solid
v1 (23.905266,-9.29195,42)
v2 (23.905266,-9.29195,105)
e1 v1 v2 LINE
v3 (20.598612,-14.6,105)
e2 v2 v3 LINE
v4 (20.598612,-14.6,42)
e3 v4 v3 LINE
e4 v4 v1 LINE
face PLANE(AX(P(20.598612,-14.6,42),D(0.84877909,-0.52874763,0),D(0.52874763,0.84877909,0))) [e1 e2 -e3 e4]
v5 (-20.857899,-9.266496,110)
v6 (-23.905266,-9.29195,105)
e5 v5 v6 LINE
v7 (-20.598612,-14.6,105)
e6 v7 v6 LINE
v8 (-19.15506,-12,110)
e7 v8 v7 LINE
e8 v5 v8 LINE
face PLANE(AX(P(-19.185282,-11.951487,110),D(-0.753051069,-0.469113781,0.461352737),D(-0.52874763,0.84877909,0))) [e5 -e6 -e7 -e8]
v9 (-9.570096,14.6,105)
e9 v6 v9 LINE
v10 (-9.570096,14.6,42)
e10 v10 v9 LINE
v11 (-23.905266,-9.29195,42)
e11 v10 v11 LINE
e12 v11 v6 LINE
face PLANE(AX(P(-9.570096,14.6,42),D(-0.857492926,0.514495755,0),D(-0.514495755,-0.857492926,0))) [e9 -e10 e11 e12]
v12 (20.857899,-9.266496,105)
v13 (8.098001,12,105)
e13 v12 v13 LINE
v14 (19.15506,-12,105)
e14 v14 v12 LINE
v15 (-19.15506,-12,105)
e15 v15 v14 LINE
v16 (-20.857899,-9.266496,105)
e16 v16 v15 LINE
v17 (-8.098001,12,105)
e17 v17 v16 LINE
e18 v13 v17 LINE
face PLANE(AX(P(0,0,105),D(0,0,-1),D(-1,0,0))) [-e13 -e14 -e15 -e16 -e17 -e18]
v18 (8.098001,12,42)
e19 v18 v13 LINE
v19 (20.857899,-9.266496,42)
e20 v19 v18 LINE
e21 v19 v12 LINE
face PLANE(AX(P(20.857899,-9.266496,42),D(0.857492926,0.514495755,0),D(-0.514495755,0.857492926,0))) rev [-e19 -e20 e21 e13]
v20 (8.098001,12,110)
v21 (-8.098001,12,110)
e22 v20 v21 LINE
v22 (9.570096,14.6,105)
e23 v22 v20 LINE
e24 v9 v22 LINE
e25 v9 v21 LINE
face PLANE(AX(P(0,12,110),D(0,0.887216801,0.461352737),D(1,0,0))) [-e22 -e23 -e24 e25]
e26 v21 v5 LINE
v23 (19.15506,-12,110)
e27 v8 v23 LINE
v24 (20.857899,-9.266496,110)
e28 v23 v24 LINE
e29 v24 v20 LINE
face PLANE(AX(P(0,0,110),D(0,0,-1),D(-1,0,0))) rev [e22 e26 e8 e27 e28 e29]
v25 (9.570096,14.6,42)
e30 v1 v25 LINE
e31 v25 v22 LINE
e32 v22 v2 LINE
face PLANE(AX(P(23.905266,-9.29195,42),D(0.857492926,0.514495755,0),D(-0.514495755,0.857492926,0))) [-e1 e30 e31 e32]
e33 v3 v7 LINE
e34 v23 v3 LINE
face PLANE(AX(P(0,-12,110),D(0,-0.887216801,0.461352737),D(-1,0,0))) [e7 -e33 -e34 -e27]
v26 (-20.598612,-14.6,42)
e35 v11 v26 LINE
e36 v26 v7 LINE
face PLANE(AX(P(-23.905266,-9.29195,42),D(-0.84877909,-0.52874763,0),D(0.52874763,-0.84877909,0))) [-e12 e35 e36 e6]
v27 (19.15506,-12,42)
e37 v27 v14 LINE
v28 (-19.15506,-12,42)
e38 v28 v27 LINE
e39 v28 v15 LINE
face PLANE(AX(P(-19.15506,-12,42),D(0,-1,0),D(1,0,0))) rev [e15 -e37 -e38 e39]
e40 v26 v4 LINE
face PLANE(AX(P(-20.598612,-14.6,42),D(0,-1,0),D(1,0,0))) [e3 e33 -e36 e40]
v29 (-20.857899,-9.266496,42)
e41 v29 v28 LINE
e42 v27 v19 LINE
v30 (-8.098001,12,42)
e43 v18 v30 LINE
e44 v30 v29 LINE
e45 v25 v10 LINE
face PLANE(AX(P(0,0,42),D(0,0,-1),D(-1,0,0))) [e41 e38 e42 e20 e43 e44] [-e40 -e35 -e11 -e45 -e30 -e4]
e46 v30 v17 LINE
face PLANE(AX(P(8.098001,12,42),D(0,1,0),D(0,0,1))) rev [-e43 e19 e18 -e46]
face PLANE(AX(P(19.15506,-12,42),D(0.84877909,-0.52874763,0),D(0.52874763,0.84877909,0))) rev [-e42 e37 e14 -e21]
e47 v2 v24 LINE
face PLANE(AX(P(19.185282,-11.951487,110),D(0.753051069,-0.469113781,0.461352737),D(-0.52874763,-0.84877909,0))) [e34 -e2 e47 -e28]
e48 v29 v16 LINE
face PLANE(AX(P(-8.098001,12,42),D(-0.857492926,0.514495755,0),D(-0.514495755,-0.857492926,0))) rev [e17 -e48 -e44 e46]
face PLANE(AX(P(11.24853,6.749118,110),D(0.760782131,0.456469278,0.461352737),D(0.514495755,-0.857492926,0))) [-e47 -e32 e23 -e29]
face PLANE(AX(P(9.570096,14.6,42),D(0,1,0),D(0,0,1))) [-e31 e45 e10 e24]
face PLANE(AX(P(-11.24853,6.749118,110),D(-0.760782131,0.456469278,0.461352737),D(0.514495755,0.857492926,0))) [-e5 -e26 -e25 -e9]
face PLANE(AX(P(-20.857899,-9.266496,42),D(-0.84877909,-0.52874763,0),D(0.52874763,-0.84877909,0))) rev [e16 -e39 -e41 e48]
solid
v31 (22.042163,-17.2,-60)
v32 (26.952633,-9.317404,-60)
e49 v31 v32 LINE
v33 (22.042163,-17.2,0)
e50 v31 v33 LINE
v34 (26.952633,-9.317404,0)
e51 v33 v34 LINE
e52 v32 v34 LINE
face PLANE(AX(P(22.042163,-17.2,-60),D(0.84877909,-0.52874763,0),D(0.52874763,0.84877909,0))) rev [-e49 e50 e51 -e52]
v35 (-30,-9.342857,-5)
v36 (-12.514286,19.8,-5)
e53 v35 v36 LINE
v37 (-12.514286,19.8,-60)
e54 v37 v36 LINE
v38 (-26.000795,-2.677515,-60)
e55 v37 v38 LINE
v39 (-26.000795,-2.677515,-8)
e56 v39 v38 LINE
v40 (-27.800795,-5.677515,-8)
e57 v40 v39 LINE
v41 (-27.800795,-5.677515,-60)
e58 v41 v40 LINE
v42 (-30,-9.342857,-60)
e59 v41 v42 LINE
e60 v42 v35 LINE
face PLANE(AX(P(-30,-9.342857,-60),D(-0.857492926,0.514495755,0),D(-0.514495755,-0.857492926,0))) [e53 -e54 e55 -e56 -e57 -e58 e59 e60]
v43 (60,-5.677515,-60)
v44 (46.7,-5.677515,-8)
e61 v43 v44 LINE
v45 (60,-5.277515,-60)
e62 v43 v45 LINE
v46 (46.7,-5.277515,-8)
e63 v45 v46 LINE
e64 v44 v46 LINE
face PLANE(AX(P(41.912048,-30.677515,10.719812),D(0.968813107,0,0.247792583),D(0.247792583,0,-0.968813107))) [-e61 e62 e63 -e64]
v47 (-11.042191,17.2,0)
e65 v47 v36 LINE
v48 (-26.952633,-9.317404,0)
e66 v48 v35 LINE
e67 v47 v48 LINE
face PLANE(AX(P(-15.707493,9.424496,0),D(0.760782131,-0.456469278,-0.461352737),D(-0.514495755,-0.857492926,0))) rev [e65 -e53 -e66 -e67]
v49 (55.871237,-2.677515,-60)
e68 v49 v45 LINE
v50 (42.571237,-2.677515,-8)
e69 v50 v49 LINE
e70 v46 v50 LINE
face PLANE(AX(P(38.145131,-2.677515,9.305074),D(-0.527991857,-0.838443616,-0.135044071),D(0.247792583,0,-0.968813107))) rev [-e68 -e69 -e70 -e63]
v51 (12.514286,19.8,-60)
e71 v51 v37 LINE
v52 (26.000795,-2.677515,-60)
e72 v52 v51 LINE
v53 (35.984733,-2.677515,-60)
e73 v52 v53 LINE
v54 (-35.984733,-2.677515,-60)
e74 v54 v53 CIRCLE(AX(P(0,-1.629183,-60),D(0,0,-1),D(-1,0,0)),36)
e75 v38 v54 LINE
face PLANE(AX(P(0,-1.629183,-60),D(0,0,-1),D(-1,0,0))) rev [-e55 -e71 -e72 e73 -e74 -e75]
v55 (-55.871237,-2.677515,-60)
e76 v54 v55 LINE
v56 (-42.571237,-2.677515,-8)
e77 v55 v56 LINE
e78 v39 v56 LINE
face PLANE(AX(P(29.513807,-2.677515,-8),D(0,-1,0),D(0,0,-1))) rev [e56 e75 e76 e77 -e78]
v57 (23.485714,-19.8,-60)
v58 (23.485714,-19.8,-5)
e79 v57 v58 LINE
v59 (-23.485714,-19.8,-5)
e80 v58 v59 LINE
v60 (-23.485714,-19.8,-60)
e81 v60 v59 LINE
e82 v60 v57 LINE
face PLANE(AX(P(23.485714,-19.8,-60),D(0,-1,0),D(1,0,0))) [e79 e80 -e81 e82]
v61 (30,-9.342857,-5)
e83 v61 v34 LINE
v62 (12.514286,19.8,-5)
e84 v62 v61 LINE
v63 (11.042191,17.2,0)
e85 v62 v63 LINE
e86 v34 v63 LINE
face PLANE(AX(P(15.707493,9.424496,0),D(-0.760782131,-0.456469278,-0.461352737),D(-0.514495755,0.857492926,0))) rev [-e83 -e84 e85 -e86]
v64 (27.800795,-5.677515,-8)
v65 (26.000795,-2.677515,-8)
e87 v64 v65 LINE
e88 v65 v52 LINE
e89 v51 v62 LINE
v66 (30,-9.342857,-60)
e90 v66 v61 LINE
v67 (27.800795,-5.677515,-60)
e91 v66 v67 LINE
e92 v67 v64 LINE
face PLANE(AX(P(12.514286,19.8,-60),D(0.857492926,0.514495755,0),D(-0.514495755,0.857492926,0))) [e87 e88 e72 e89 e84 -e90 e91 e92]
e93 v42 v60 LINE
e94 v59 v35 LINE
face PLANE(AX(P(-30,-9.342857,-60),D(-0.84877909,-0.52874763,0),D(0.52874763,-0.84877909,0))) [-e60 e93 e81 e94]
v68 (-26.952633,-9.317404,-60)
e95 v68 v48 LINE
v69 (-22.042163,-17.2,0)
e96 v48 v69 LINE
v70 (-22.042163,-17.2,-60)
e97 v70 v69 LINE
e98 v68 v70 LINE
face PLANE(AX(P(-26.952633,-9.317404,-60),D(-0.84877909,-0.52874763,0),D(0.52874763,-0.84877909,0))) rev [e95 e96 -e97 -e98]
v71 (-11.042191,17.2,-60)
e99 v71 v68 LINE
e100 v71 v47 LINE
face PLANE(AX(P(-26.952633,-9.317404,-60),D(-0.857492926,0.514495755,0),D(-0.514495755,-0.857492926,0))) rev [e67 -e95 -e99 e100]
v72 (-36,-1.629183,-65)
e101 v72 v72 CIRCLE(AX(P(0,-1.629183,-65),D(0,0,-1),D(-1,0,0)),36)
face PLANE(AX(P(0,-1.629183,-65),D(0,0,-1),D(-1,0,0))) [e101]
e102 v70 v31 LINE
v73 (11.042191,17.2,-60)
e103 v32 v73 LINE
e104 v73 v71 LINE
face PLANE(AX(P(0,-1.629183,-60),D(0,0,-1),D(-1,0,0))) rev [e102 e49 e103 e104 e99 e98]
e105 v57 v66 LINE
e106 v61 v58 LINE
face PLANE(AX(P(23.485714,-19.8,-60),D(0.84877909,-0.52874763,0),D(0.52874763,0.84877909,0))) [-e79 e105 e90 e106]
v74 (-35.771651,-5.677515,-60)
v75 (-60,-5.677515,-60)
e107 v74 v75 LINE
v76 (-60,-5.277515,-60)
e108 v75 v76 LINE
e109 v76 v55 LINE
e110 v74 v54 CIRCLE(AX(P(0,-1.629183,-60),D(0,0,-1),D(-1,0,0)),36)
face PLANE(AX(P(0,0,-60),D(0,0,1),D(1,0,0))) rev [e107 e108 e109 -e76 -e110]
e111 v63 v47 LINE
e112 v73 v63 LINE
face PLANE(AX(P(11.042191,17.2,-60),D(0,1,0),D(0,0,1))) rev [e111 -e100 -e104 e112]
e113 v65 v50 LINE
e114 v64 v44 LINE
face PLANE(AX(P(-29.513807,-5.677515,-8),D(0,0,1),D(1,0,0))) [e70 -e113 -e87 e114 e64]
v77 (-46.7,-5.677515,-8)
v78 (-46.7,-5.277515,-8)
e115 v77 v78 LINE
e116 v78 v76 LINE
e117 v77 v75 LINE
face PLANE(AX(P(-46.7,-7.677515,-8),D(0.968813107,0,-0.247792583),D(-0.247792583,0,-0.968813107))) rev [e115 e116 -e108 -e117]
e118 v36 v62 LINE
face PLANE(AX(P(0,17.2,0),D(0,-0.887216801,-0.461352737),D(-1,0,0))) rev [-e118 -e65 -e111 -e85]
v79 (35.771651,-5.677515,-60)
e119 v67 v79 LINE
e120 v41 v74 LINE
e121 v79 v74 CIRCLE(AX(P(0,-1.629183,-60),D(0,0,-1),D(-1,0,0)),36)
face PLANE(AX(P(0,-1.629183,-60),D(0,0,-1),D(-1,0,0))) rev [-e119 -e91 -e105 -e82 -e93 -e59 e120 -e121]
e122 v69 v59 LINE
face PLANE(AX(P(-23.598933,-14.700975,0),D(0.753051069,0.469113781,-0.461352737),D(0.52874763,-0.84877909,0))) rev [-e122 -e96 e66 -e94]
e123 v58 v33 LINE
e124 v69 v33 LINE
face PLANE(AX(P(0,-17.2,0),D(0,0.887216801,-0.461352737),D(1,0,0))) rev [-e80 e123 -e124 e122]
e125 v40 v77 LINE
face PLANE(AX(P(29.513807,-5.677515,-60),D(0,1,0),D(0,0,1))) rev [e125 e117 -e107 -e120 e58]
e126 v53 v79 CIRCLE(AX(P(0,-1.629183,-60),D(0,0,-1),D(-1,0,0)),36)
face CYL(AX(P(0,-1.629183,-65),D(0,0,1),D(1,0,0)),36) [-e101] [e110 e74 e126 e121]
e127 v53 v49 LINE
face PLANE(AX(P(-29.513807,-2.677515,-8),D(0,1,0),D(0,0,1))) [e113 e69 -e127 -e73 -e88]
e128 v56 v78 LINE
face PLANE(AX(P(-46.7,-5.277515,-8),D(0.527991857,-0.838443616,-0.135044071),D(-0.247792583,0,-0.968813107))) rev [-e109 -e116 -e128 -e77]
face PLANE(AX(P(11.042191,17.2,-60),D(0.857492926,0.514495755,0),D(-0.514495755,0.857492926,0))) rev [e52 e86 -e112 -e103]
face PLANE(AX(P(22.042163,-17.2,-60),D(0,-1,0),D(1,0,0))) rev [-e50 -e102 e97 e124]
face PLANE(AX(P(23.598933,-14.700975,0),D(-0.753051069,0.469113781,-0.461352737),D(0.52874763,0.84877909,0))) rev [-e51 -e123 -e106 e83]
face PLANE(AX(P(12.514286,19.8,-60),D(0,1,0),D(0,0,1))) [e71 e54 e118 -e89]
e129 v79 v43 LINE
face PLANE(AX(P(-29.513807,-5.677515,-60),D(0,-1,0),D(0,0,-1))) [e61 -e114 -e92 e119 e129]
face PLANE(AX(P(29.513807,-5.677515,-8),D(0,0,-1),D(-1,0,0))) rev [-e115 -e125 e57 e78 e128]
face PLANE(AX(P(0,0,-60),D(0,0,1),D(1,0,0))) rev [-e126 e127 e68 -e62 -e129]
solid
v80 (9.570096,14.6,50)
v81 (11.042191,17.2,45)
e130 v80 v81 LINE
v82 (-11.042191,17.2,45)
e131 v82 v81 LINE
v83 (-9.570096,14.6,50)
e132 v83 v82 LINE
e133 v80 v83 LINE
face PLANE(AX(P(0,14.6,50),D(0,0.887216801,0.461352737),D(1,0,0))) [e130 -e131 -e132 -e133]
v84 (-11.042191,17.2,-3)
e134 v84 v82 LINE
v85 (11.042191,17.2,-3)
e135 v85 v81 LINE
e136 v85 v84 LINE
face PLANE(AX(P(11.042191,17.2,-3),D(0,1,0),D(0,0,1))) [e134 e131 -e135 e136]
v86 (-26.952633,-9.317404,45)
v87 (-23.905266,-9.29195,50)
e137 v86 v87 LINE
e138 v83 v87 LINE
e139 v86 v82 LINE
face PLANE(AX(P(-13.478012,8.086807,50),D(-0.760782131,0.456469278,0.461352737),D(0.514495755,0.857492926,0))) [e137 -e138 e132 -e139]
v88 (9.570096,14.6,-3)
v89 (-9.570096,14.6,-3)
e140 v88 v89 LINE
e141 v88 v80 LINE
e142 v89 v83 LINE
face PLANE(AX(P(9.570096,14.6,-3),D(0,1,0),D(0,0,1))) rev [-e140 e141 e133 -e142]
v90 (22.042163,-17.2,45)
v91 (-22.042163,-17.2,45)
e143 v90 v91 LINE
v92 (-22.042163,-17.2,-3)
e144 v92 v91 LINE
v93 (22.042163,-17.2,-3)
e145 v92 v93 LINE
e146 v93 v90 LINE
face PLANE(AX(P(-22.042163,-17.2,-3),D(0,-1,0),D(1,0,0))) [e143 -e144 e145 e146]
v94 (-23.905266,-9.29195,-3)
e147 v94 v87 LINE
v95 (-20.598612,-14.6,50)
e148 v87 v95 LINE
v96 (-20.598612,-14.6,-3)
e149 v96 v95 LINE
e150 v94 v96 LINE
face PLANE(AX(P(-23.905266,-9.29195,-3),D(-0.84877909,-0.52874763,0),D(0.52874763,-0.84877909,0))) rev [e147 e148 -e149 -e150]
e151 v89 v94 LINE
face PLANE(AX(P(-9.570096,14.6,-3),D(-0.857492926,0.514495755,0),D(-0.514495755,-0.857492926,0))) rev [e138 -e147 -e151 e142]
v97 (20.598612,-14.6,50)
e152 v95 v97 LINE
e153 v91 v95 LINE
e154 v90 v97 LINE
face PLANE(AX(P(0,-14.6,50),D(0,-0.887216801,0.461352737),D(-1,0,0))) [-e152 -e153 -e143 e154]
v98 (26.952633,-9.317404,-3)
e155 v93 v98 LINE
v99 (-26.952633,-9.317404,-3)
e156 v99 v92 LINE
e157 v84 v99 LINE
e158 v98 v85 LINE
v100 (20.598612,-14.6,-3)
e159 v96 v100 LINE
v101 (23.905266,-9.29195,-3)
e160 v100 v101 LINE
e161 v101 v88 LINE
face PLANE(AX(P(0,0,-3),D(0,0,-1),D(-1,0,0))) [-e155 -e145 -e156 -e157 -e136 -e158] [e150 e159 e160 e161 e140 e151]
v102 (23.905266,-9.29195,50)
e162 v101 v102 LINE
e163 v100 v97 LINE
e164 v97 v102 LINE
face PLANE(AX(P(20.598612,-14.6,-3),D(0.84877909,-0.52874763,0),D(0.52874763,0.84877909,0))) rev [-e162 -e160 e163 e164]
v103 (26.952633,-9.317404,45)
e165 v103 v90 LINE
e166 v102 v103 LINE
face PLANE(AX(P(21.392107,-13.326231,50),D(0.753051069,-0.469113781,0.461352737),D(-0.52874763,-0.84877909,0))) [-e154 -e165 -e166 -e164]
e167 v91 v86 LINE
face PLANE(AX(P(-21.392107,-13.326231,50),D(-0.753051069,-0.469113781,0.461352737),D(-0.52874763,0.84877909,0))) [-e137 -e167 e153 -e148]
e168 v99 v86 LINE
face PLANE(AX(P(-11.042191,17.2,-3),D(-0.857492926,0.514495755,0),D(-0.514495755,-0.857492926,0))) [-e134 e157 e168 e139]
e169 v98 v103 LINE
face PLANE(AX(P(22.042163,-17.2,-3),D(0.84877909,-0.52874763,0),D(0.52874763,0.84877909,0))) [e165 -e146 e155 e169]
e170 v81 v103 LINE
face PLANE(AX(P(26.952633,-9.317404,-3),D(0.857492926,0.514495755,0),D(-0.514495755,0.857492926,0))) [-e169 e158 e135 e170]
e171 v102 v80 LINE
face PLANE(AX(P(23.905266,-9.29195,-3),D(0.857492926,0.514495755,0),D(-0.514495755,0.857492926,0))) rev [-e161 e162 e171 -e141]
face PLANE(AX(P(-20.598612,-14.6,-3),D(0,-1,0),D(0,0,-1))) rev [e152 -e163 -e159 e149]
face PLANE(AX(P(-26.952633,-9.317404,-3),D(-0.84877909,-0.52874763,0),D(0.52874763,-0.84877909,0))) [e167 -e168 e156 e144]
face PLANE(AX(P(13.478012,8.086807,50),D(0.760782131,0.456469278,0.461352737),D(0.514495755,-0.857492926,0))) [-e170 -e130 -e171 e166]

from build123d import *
from OCP.BRepFilletAPI import BRepFilletAPI_MakeChamfer

# Parameters (mm, degrees)
BOSS_EXTRUDE1_DEPTH      = 60
BOSS_EXTRUDE2_DEPTH      = 50
BOSS_EXTRUDE2_DEPTH_BACK = 3
CHAMFER1_SIZE            = 5
CHAMFER1_SIZE_2          = 2.6
BOSS_EXTRUDE3_DEPTH      = 60
BOSS_EXTRUDE3_DEPTH_BACK = 8
CHAMFER2_SIZE            = 2.6
CHAMFER2_SIZE_2          = 5
BOSS_EXTRUDE4_REACH      = 145.499
SKETCH9_W                = 52
SKETCH9_H                = 3
CUT_EXTRUDE1_DEPTH       = 28
CHAMFER3_SIZE            = 2.6
CHAMFER3_SIZE_2          = 5
BOSS_EXTRUDE5_DEPTH      = 5
BOSS_EXTRUDE6_REACH      = 165.988
SKETCH13_W               = 52
SKETCH13_H               = 3
CUT_EXTRUDE2_DEPTH       = 5
CHAMFER4_SIZE            = 4
CHAMFER4_SIZE2           = 2.6
CHAMFER5_SIZE            = 2.6
CHAMFER5_SIZE2           = 4
SKETCH16_R               = 36
BOSS_EXTRUDE7_DEPTH      = 5


with BuildPart() as part:
    # Sketch1 → Boss-Extrude1 (new body)
    with BuildSketch(Plane.XY):
        Polygon((23.485714286, -19.8), (-23.485714286, -19.8), (-30, -9.342857143), (-12.514285714, 19.8), (12.514285714, 19.8), (30, -9.342857143), align=None)
        Polygon((-26.95263288, -9.317403585), (-11.042190729, 17.2), (11.042190729, 17.2), (26.95263288, -9.317403585), (22.042162982, -17.2), (-22.042162982, -17.2), align=None, mode=Mode.SUBTRACT)
    extrude(amount=-BOSS_EXTRUDE1_DEPTH)

    # Chamfer1
    chamfer1_edges_1 = [part.edges().sort_by_distance(p)[0] for p in [
        (26.742857143, -14.571428571, 0),
    ]]
    chamfer1_side_1 = [part.faces().sort_by_distance(p)[0] for p in [
        (26.742857143, -14.571428571, -0.052),
    ]]
    chamfer1_edges_2 = [part.edges().sort_by_distance(p)[0] for p in [
        (0, -19.8, 0),
    ]]
    chamfer1_side_2 = [part.faces().sort_by_distance(p)[0] for p in [
        (0, -19.8, -0.052),
    ]]
    chamfer1_edges_3 = [part.edges().sort_by_distance(p)[0] for p in [
        (-26.742857143, -14.571428571, 0),
    ]]
    chamfer1_side_3 = [part.faces().sort_by_distance(p)[0] for p in [
        (-26.742857143, -14.571428571, -0.052),
    ]]
    chamfer1_edges_4 = [part.edges().sort_by_distance(p)[0] for p in [
        (-21.257142857, 5.228571429, 0),
    ]]
    chamfer1_side_4 = [part.faces().sort_by_distance(p)[0] for p in [
        (-21.257142857, 5.228571429, -0.052),
    ]]
    chamfer1_edges_5 = [part.edges().sort_by_distance(p)[0] for p in [
        (0, 19.8, 0),
    ]]
    chamfer1_side_5 = [part.faces().sort_by_distance(p)[0] for p in [
        (0, 19.8, -0.052),
    ]]
    chamfer1_edges_6 = [part.edges().sort_by_distance(p)[0] for p in [
        (21.257142857, 5.228571429, 0),
    ]]
    chamfer1_side_6 = [part.faces().sort_by_distance(p)[0] for p in [
        (21.257142857, 5.228571429, -0.052),
    ]]
    chamfer1 = BRepFilletAPI_MakeChamfer(part.part.solid().wrapped)
    for e in chamfer1_edges_1:
        chamfer1.Add(CHAMFER1_SIZE - 0.0001, CHAMFER1_SIZE_2 - 0.0001, e.wrapped, chamfer1_side_1[0].wrapped)
    for e in chamfer1_edges_2:
        chamfer1.Add(CHAMFER1_SIZE - 0.0001, CHAMFER1_SIZE_2 - 0.0001, e.wrapped, chamfer1_side_2[0].wrapped)
    for e in chamfer1_edges_3:
        chamfer1.Add(CHAMFER1_SIZE - 0.0001, CHAMFER1_SIZE_2 - 0.0001, e.wrapped, chamfer1_side_3[0].wrapped)
    for e in chamfer1_edges_4:
        chamfer1.Add(CHAMFER1_SIZE - 0.0001, CHAMFER1_SIZE_2 - 0.0001, e.wrapped, chamfer1_side_4[0].wrapped)
    for e in chamfer1_edges_5:
        chamfer1.Add(CHAMFER1_SIZE - 0.0001, CHAMFER1_SIZE_2 - 0.0001, e.wrapped, chamfer1_side_5[0].wrapped)
    for e in chamfer1_edges_6:
        chamfer1.Add(CHAMFER1_SIZE - 0.0001, CHAMFER1_SIZE_2 - 0.0001, e.wrapped, chamfer1_side_6[0].wrapped)
    add(Compound.cast(chamfer1.Shape()), mode=Mode.REPLACE)  # a hair under: the kernel refuses the full size

    # Boss-Extrude4: up to this plane
    boss_extrude4_end = Plane(origin=(12.514285714, 19.8, -60), z_dir=(0.8574929257125442, 0.5144957554275265, 0))
    # Sketch9 → Boss-Extrude4 (add, up to the surface)
    with BuildSketch(Plane(origin=(60, 0, 0), x_dir=(0, 0, -1), z_dir=(1, 0, 0)), mode=Mode.PRIVATE) as boss_extrude4_sk1:
        with Locations((34, -4.177515253)):
            Rectangle(SKETCH9_W, SKETCH9_H)
    boss_extrude4_tool1 = split(extrude(boss_extrude4_sk1.sketch, amount=-BOSS_EXTRUDE4_REACH, mode=Mode.PRIVATE), bisect_by=boss_extrude4_end, keep=Keep.BOTH, mode=Mode.PRIVATE)
    add(boss_extrude4_tool1.solids().sort_by_distance((60, -4.177515, -34))[0])

    # Sketch10 → Cut-Extrude1 (cut)
    with BuildSketch(Plane(origin=(0, -2.677515253, 0), x_dir=(1, 0, 0), z_dir=(0, 1, 0))):
        Polygon((60, 8), (60, 60), (46.7, 8), align=None)
    extrude(amount=-CUT_EXTRUDE1_DEPTH, mode=Mode.SUBTRACT)

    # Boss-Extrude6: up to this plane
    boss_extrude6_end = Plane(origin=(-30, -9.342857143, -60), z_dir=(-0.8574929257125442, 0.5144957554275265, 0))
    # Sketch13 → Boss-Extrude6 (add, up to the surface)
    with BuildSketch(Plane(origin=(-60, 0, 0), x_dir=(0, 0, -1), z_dir=(1, 0, 0)), mode=Mode.PRIVATE) as boss_extrude6_sk1:
        with Locations((34, -4.177515253)):
            Rectangle(SKETCH13_W, SKETCH13_H)
    boss_extrude6_tool1 = split(extrude(boss_extrude6_sk1.sketch, amount=BOSS_EXTRUDE6_REACH, mode=Mode.PRIVATE), bisect_by=boss_extrude6_end, keep=Keep.BOTH, mode=Mode.PRIVATE)
    add(boss_extrude6_tool1.solids().sort_by_distance((-60, -4.177515, -34))[0])

    # Sketch14 → Cut-Extrude2 (cut)
    with BuildSketch(Plane(origin=(0, -2.677515253, 0), x_dir=(1, 0, 0), z_dir=(0, 1, 0))):
        Polygon((-60, 60), (-60, 8), (-46.7, 8), align=None)
    extrude(amount=-CUT_EXTRUDE2_DEPTH, mode=Mode.SUBTRACT)

    # Chamfer4
    chamfer4_edges = [part.edges().sort_by_distance(p)[0] for p in [
        (-53.35, -2.677515253, -34),
    ]]
    chamfer4_side = [part.faces().sort_by_distance(p)[0] for p in [
        (-39.944890335, -2.677515253, -36.10731292),
    ]]
    chamfer(chamfer4_edges, length=CHAMFER4_SIZE, length2=CHAMFER4_SIZE2, reference=chamfer4_side[0])

    # Chamfer5
    chamfer5_edges = [part.edges().sort_by_distance(p)[0] for p in [
        (53.35, -2.677515253, -34),
    ]]
    chamfer5_side = [part.faces().sort_by_distance(p)[0] for p in [
        (53.35, -4.177515253, -34),
    ]]
    chamfer(chamfer5_edges, length=CHAMFER5_SIZE, length2=CHAMFER5_SIZE2, reference=chamfer5_side[0])

    # Sketch16 → Boss-Extrude7 (add)
    with BuildSketch(Plane(origin=(0, 0, -60), x_dir=(-1, 0, 0), z_dir=(0, 0, -1))):
        with Locations(Location((0, -1.629183352, 0), (0, 0, 181.66870794))):
            Circle(SKETCH16_R)
    extrude(amount=BOSS_EXTRUDE7_DEPTH)


with BuildPart() as body_2:
    # Sketch2 → Boss-Extrude2 (new, two sides: drawn at the far end of the back side and taken through both)
    with BuildSketch(Plane.XY.offset(-BOSS_EXTRUDE2_DEPTH_BACK)):
        Polygon((26.95263288, -9.317403585), (11.042190729, 17.2), (-11.042190729, 17.2), (-26.95263288, -9.317403585), (-22.042162982, -17.2), (22.042162982, -17.2), align=None)
        Polygon((23.90526576, -9.291950027), (9.570095744, 14.6), (-9.570095744, 14.6), (-23.90526576, -9.291950027), (-20.598611678, -14.6), (20.598611678, -14.6), align=None, mode=Mode.SUBTRACT)
    extrude(amount=BOSS_EXTRUDE2_DEPTH + BOSS_EXTRUDE2_DEPTH_BACK)

    # Chamfer2
    chamfer2_edges_1 = [body_2.edges().sort_by_distance(p)[0] for p in [
        (24.497397931, -13.258701792, 50),
    ]]
    chamfer2_side_1 = [body_2.faces().sort_by_distance(p)[0] for p in [
        (24.453261418, -13.231206916, 50),
    ]]
    chamfer2_edges_2 = [body_2.edges().sort_by_distance(p)[0] for p in [
        (18.997411804, 3.941298208, 50),
    ]]
    chamfer2_side_2 = [body_2.faces().sort_by_distance(p)[0] for p in [
        (18.997411804, 3.941298208, 49.948),
    ]]
    chamfer2_edges_3 = [body_2.edges().sort_by_distance(p)[0] for p in [
        (0, 17.2, 50),
    ]]
    chamfer2_side_3 = [body_2.faces().sort_by_distance(p)[0] for p in [
        (0, 17.2, 49.948),
    ]]
    chamfer2_edges_4 = [body_2.edges().sort_by_distance(p)[0] for p in [
        (-18.997411804, 3.941298208, 50),
    ]]
    chamfer2_side_4 = [body_2.faces().sort_by_distance(p)[0] for p in [
        (-18.997411804, 3.941298208, 49.948),
    ]]
    chamfer2_edges_5 = [body_2.edges().sort_by_distance(p)[0] for p in [
        (-24.497397931, -13.258701792, 50),
    ]]
    chamfer2_side_5 = [body_2.faces().sort_by_distance(p)[0] for p in [
        (-24.497397931, -13.258701792, 49.948),
    ]]
    chamfer2_edges_6 = [body_2.edges().sort_by_distance(p)[0] for p in [
        (0, -17.2, 50),
    ]]
    chamfer2_side_6 = [body_2.faces().sort_by_distance(p)[0] for p in [
        (0, -17.2, 49.948),
    ]]
    chamfer2 = BRepFilletAPI_MakeChamfer(body_2.part.solid().wrapped)
    for e in chamfer2_edges_1:
        chamfer2.Add(CHAMFER2_SIZE - 0.0001, CHAMFER2_SIZE_2 - 0.0001, e.wrapped, chamfer2_side_1[0].wrapped)
    for e in chamfer2_edges_2:
        chamfer2.Add(CHAMFER2_SIZE_2 - 0.0001, CHAMFER2_SIZE - 0.0001, e.wrapped, chamfer2_side_2[0].wrapped)
    for e in chamfer2_edges_3:
        chamfer2.Add(CHAMFER2_SIZE_2 - 0.0001, CHAMFER2_SIZE - 0.0001, e.wrapped, chamfer2_side_3[0].wrapped)
    for e in chamfer2_edges_4:
        chamfer2.Add(CHAMFER2_SIZE_2 - 0.0001, CHAMFER2_SIZE - 0.0001, e.wrapped, chamfer2_side_4[0].wrapped)
    for e in chamfer2_edges_5:
        chamfer2.Add(CHAMFER2_SIZE_2 - 0.0001, CHAMFER2_SIZE - 0.0001, e.wrapped, chamfer2_side_5[0].wrapped)
    for e in chamfer2_edges_6:
        chamfer2.Add(CHAMFER2_SIZE_2 - 0.0001, CHAMFER2_SIZE - 0.0001, e.wrapped, chamfer2_side_6[0].wrapped)
    add(Compound.cast(chamfer2.Shape()), mode=Mode.REPLACE)  # a hair under: the kernel refuses the full size


with BuildPart() as body_3:
    # Sketch8 → Boss-Extrude3 (new, two sides: drawn at the far end of the back side and taken through both)
    with BuildSketch(Plane.XY.offset(50).offset(-BOSS_EXTRUDE3_DEPTH_BACK)):
        Polygon((23.90526576, -9.291950027), (9.570095744, 14.6), (-9.570095744, 14.6), (-23.90526576, -9.291950027), (-20.598611678, -14.6), (20.598611678, -14.6), align=None)
        Polygon((19.155060374, -12), (20.85789864, -9.266496469), (8.098000758, 12), (-8.098000758, 12), (-20.85789864, -9.266496469), (-19.155060374, -12), align=None, mode=Mode.SUBTRACT)
    extrude(amount=BOSS_EXTRUDE3_DEPTH + BOSS_EXTRUDE3_DEPTH_BACK)

    # Chamfer3
    chamfer3_edges_1 = [body_3.edges().sort_by_distance(p)[0] for p in [
        (22.251938719, -11.945975013, 110),
    ]]
    chamfer3_side_1 = [body_3.faces().sort_by_distance(p)[0] for p in [
        (22.207802206, -11.918480137, 110),
    ]]
    chamfer3_edges_2 = [body_3.edges().sort_by_distance(p)[0] for p in [
        (16.737680752, 2.654024987, 110),
    ]]
    chamfer3_side_2 = [body_3.faces().sort_by_distance(p)[0] for p in [
        (16.737680752, 2.654024987, 109.948),
    ]]
    chamfer3_edges_3 = [body_3.edges().sort_by_distance(p)[0] for p in [
        (0, 14.6, 110),
    ]]
    chamfer3_side_3 = [body_3.faces().sort_by_distance(p)[0] for p in [
        (0, 14.6, 109.948),
    ]]
    chamfer3_edges_4 = [body_3.edges().sort_by_distance(p)[0] for p in [
        (-16.737680752, 2.654024987, 110),
    ]]
    chamfer3_side_4 = [body_3.faces().sort_by_distance(p)[0] for p in [
        (-16.737680752, 2.654024987, 109.948),
    ]]
    chamfer3_edges_5 = [body_3.edges().sort_by_distance(p)[0] for p in [
        (-22.251938719, -11.945975013, 110),
    ]]
    chamfer3_side_5 = [body_3.faces().sort_by_distance(p)[0] for p in [
        (-22.251938719, -11.945975013, 109.948),
    ]]
    chamfer3_edges_6 = [body_3.edges().sort_by_distance(p)[0] for p in [
        (0, -14.6, 110),
    ]]
    chamfer3_side_6 = [body_3.faces().sort_by_distance(p)[0] for p in [
        (0, -14.6, 109.948),
    ]]
    chamfer3 = BRepFilletAPI_MakeChamfer(body_3.part.solid().wrapped)
    for e in chamfer3_edges_1:
        chamfer3.Add(CHAMFER3_SIZE - 0.0001, CHAMFER3_SIZE_2 - 0.0001, e.wrapped, chamfer3_side_1[0].wrapped)
    for e in chamfer3_edges_2:
        chamfer3.Add(CHAMFER3_SIZE_2 - 0.0001, CHAMFER3_SIZE - 0.0001, e.wrapped, chamfer3_side_2[0].wrapped)
    for e in chamfer3_edges_3:
        chamfer3.Add(CHAMFER3_SIZE_2 - 0.0001, CHAMFER3_SIZE - 0.0001, e.wrapped, chamfer3_side_3[0].wrapped)
    for e in chamfer3_edges_4:
        chamfer3.Add(CHAMFER3_SIZE_2 - 0.0001, CHAMFER3_SIZE - 0.0001, e.wrapped, chamfer3_side_4[0].wrapped)
    for e in chamfer3_edges_5:
        chamfer3.Add(CHAMFER3_SIZE_2 - 0.0001, CHAMFER3_SIZE - 0.0001, e.wrapped, chamfer3_side_5[0].wrapped)
    for e in chamfer3_edges_6:
        chamfer3.Add(CHAMFER3_SIZE_2 - 0.0001, CHAMFER3_SIZE - 0.0001, e.wrapped, chamfer3_side_6[0].wrapped)
    add(Compound.cast(chamfer3.Shape()), mode=Mode.REPLACE)  # a hair under: the kernel refuses the full size

    # Sketch12 → Boss-Extrude5 (add)
    with BuildSketch(Plane.XY.offset(110)):
        Polygon((-20.85789864, -9.266496469), (-19.155060374, -12), (19.155060374, -12), (20.85789864, -9.266496469), (8.098000758, 12), (-8.098000758, 12), align=None)
    extrude(amount=-BOSS_EXTRUDE5_DEPTH)


solid = Compound([part.part, body_2.part, body_3.part])
